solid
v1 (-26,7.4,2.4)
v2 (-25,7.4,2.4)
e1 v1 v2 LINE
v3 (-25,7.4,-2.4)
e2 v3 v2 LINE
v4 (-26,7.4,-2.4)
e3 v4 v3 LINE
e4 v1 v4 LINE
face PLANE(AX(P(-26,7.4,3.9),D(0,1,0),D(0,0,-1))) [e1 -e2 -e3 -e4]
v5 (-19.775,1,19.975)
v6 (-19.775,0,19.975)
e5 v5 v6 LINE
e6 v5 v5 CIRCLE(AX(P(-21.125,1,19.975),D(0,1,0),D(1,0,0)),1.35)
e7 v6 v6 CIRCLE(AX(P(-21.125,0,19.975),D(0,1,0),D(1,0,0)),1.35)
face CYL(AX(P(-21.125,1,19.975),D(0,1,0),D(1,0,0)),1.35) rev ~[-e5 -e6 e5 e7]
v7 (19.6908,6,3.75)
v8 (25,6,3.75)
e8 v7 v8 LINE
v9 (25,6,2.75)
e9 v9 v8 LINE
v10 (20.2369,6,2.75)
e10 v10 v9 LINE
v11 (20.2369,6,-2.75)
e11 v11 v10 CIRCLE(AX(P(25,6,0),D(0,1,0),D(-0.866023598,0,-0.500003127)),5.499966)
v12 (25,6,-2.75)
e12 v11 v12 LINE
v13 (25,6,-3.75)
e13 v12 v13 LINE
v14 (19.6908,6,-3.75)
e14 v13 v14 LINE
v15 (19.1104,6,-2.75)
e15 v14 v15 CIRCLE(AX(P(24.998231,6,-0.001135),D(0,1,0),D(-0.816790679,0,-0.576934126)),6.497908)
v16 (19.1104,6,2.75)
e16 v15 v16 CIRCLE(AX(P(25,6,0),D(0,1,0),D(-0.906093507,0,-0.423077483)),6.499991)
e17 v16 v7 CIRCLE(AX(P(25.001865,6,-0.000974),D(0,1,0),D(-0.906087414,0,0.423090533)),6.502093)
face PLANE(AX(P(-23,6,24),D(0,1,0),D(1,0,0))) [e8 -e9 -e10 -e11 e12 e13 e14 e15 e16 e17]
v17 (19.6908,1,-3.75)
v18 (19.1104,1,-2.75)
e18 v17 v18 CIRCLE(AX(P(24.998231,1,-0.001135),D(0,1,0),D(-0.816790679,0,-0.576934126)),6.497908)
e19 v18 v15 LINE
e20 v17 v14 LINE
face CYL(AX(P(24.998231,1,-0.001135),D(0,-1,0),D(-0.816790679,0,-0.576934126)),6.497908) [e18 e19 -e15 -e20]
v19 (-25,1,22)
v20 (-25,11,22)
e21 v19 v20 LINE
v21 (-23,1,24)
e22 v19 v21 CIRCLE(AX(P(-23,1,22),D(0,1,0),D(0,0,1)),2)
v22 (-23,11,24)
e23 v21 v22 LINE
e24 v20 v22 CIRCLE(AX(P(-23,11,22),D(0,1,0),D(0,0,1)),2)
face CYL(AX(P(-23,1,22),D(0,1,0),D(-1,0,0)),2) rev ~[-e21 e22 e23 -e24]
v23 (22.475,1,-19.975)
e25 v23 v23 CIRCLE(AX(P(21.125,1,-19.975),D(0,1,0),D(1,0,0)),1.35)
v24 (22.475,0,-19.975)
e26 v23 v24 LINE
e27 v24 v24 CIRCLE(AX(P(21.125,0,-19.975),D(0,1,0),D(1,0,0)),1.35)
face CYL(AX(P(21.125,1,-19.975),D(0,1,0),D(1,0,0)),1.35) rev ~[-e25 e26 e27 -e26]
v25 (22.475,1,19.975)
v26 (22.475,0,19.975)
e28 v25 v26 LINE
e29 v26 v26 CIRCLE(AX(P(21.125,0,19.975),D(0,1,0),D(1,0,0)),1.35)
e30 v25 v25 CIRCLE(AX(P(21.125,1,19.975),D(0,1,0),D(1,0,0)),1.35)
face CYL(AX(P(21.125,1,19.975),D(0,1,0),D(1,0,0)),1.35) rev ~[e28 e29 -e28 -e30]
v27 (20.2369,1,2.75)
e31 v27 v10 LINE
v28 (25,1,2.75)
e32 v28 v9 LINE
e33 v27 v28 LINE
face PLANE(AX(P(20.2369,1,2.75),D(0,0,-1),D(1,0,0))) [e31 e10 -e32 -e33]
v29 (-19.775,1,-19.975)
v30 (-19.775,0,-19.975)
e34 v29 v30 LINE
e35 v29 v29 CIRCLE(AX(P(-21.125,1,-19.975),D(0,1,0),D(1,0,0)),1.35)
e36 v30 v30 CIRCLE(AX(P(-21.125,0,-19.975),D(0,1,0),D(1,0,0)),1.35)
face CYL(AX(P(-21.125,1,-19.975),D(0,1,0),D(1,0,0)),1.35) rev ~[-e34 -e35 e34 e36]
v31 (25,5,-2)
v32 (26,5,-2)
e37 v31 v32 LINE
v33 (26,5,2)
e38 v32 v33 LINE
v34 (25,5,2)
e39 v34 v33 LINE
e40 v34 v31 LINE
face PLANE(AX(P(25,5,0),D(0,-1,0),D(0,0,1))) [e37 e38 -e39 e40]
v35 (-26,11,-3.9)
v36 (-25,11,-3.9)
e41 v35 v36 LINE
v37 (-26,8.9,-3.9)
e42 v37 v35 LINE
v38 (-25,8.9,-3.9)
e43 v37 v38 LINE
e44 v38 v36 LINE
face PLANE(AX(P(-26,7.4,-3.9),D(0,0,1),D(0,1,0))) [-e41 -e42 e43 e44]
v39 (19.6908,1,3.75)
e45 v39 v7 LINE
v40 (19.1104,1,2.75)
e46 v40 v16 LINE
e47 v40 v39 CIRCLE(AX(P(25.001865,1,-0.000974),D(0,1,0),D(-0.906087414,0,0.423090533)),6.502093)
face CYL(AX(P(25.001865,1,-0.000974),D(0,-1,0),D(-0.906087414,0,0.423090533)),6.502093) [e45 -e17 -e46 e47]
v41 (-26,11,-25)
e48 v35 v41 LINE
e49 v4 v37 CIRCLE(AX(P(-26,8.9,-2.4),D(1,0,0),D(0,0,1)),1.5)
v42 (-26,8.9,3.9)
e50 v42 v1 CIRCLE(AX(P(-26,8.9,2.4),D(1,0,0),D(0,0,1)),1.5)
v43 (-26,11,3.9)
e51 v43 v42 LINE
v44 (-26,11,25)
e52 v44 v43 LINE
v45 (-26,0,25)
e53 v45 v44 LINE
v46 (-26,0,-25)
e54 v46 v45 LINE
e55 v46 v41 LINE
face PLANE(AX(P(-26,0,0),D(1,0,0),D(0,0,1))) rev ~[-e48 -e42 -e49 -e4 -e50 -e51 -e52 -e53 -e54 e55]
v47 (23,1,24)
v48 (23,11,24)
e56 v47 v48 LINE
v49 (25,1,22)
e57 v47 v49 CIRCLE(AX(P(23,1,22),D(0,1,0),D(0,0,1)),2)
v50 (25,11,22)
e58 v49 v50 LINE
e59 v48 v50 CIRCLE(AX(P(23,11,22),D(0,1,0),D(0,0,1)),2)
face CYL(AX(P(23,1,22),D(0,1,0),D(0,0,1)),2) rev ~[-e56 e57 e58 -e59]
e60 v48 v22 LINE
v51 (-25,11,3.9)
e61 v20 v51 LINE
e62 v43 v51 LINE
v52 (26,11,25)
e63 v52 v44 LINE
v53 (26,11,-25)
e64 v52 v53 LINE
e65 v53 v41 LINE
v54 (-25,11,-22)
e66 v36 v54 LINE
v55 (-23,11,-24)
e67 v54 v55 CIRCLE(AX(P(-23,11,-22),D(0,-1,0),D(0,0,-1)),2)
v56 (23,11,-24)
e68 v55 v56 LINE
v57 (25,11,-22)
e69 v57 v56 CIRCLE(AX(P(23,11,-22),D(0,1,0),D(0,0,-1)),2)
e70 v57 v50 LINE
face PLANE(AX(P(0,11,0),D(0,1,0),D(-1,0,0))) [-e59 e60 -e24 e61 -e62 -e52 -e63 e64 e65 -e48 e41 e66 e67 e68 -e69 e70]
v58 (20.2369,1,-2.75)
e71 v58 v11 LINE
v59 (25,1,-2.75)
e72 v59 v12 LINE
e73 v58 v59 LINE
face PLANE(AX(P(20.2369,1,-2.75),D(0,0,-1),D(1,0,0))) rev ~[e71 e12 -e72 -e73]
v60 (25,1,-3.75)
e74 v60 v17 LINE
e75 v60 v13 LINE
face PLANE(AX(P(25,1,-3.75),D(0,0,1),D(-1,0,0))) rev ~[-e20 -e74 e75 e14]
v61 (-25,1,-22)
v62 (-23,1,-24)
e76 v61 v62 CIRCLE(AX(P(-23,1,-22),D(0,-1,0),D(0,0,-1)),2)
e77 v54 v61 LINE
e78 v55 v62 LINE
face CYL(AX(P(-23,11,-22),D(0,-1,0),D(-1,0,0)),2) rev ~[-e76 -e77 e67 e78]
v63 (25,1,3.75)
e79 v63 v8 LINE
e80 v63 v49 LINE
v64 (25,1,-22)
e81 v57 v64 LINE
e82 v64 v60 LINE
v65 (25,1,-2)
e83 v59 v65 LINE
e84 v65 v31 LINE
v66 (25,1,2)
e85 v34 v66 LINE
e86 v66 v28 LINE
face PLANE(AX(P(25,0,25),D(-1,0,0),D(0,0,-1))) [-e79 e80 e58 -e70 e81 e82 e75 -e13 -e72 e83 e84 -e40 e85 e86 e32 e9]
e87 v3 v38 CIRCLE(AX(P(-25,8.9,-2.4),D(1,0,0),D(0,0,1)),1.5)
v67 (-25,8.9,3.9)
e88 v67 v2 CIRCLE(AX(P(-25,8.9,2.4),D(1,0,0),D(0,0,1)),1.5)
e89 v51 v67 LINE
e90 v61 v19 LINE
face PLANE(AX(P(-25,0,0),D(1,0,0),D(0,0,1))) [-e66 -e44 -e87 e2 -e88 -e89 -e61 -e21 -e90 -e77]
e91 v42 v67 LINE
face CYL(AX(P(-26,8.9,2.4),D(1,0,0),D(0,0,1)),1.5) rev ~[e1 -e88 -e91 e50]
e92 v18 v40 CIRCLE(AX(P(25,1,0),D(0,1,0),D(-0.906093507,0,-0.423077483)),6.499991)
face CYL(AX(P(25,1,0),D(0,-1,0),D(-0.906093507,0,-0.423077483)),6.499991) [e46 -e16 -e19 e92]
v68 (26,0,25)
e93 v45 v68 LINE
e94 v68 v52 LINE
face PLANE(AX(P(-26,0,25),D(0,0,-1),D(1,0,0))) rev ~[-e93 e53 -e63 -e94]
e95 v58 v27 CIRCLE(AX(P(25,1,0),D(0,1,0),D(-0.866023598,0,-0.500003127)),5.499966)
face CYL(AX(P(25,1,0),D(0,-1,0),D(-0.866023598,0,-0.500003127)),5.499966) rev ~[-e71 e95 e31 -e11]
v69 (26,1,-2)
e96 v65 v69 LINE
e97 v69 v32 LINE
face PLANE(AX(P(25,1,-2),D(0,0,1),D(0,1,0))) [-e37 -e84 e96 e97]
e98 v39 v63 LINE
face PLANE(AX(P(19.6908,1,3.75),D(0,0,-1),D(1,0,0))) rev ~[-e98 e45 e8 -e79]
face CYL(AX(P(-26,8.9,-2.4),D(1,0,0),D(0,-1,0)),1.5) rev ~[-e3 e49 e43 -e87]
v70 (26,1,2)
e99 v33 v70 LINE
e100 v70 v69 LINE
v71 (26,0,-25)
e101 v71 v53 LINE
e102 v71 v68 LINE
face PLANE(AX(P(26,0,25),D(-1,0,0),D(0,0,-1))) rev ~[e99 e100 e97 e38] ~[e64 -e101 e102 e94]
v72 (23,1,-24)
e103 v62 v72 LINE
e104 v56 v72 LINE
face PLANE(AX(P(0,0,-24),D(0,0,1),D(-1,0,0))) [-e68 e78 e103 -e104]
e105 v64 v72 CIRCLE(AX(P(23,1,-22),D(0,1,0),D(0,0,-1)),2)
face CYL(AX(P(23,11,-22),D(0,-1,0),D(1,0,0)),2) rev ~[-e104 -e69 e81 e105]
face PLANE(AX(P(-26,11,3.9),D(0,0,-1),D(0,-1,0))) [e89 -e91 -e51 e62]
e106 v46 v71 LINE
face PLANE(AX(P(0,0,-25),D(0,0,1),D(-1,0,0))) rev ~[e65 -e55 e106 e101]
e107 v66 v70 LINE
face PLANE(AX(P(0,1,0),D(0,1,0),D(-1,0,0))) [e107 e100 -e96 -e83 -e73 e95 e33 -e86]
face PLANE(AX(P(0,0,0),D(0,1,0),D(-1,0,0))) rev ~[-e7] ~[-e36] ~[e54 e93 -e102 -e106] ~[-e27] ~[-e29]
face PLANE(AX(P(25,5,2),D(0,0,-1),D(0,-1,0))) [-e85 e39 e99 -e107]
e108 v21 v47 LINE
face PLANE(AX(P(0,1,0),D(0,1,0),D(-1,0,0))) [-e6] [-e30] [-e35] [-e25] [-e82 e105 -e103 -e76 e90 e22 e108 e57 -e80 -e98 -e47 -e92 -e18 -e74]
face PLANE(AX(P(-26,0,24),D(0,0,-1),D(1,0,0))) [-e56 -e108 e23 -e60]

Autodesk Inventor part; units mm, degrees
ref_plane "YZ Plane" through (0, 0, 0) normal (1, 0, 0) x (0, 1, 0)
ref_plane "XZ Plane" through (0, 0, 0) normal (0, 1, 0) x (-1, 0, 0)
ref_plane "XY Plane" through (0, 0, 0) normal (0, 0, 1) x (1, 0, 0)
sketch "Эскиз1" plane through (0, 0, 0) normal (0, 1, 0) x (-1, 0, 0)
  line L0 (26, 25) -> (-26, 25)
  line L1 (-26, 25) -> (-26, -25)
  line L2 (-26, -25) -> (26, -25)
  line L3 (26, -25) -> (26, 25)
  line L4 (36.4, 0) -> (-36.4, 0) projected
  line L5 (0, -35) -> (0, 35) projected
  point P0 (0, 0)
  dimension "d0" = 52
  dimension "d1" = 50
extrude "Выдавливание1" add sketch "Эскиз1" along normal blind 11
shell "Оболочка1" thickness 1 removed faces 1 at (-8.6667, 11, -8.3333)
sketch "Эскиз2" plane through (-26, 0, -25) normal (-1, 0, 0) x (0, 0, 1)
  line L0 (28.9, 7.4) -> (21.1, 7.4)
  line L1 (21.1, 7.4) -> (21.1, 11)
  line L2 (21.1, 11) -> (28.9, 11)
  line L3 (28.9, 11) -> (28.9, 7.4)
  line L4 (0, 0) -> (50, 0) projected
  line L5 (25, -2.2) -> (25, 13.2) projected
  line L6 (0, 11) -> (50, 11) projected
  point P0 (25, 0)
  dimension "d5" = 7.4
  dimension "d7" = 7.8
extrude "Выдавливание2" cut sketch "Эскиз2" against normal up to surface (1 mm away)
fillet "Сопряжение1" radius 1.5 2 edges at (-25.5, 7.4, -3.9) (-25.5, 7.4, 3.9)
fillet "Сопряжение2" radius 2 4 edges at (25, 6, 24) (25, 6, -24) (-25, 6, -24) (-25, 6, 24)
sketch "Эскиз4" plane through (25, 1, -22) normal (-1, 0, 0) x (0, 0, 1)
  line L0 (44, 0) -> (0, 0) projected
  line L1 (24, 0) -> (20, 0)
  line L2 (20, 0) -> (20, 4)
  line L3 (20, 4) -> (24, 4)
  line L4 (24, 4) -> (24, 0)
  line L5 (22, -3.2) -> (22, 12.2) projected
  point P0 (22, -1)
  dimension "d16" = 4
  dimension "d17" = 4
extrude "Выдавливание4" cut sketch "Эскиз4" against normal through all
sketch "Эскиз5" plane through (-23, 1, 24) normal (0, 1, 0) x (1, 0, 0)
  line L0 (48, 26) -> (48, 22) construction
  circle A0 centre (48, 24) radius 7 construction
  line L1 (48, 26) -> (48, 46) construction
  line L2 (48, 26.75) -> (41, 26.75) construction
  line L3 (41, 26.75) -> (41, 21.25) construction
  line L4 (41, 21.25) -> (48, 21.25) construction
  line L5 (48, 21.25) -> (48, 26.75) construction
  line L6 (-14.64, 24) -> (66.84, 24) construction
  line L7 (48, 2) -> (48, 22) construction
  line L8 (41, 21.25) -> (48, 21.25) construction
  line L9 (48, 21.25) -> (48, 20.25) construction
  line L10 (48, 20.25) -> (41, 20.25) construction
  line L11 (41, 20.25) -> (41, 21.25) construction
  line L12 (41, 26.75) -> (48, 26.75) construction
  line L13 (48, 26.75) -> (48, 27.75) construction
  line L14 (48, 27.75) -> (41, 27.75) construction
  line L15 (41, 27.75) -> (41, 26.75) construction
  arc A1 (42.1104, 21.25) -> (42.6908, 20.25) centre (48, 24) ccw
  arc A2 (42.6908, 27.75) -> (42.1104, 26.75) centre (48, 24) ccw
  arc A3 (42.1104, 26.75) -> (42.1104, 21.25) centre (48, 24) ccw
  arc A4 (43.2369, 26.75) -> (43.2369, 21.25) centre (48, 24) ccw
  line L16 (43.2369, 26.75) -> (48, 26.75)
  line L17 (48, 26.75) -> (48, 27.75)
  line L18 (48, 27.75) -> (42.6908, 27.75)
  line L19 (43.2369, 21.25) -> (48, 21.25)
  line L20 (48, 21.25) -> (48, 20.25)
  line L21 (42.6908, 20.25) -> (48, 20.25)
  point P0 (23, 24)
  dimension "d20" = 14
  dimension "d21" = 5.5
  dimension "d22" = 1
  dimension "d23" = 1
  dimension "d24" = 0.5
  dimension "d25" = 1
extrude "Выдавливание5" add sketch "Эскиз5" along normal blind 5
sketch "Эскиз8" plane through (-23, 1, -24) normal (0, 1, 0) x (1, 0, 0)
  line L0 (1.875, -4.025) -> (44.125, -4.025) construction
  line L1 (44.125, -4.025) -> (44.125, -43.975) construction
  line L2 (44.125, -43.975) -> (1.875, -43.975) construction
  line L3 (1.875, -43.975) -> (1.875, -4.025) construction
  line L4 (23, 11) -> (23, -59) construction
  line L5 (-13.4, -24) -> (59.4, -24) construction
  circle A0 centre (1.875, -4.025) radius 1.35
  circle A1 centre (44.125, -4.025) radius 1.35
  circle A2 centre (1.875, -43.975) radius 1.35
  circle A3 centre (44.125, -43.975) radius 1.35
  point P0 (23, -24)
  dimension "d33" = 42.25
  dimension "d34" = 39.95
  dimension "d35" = 2.7
extrude "Выдавливание7" cut sketch "Эскиз8" against normal through all
properties part number "BOTTOM"
